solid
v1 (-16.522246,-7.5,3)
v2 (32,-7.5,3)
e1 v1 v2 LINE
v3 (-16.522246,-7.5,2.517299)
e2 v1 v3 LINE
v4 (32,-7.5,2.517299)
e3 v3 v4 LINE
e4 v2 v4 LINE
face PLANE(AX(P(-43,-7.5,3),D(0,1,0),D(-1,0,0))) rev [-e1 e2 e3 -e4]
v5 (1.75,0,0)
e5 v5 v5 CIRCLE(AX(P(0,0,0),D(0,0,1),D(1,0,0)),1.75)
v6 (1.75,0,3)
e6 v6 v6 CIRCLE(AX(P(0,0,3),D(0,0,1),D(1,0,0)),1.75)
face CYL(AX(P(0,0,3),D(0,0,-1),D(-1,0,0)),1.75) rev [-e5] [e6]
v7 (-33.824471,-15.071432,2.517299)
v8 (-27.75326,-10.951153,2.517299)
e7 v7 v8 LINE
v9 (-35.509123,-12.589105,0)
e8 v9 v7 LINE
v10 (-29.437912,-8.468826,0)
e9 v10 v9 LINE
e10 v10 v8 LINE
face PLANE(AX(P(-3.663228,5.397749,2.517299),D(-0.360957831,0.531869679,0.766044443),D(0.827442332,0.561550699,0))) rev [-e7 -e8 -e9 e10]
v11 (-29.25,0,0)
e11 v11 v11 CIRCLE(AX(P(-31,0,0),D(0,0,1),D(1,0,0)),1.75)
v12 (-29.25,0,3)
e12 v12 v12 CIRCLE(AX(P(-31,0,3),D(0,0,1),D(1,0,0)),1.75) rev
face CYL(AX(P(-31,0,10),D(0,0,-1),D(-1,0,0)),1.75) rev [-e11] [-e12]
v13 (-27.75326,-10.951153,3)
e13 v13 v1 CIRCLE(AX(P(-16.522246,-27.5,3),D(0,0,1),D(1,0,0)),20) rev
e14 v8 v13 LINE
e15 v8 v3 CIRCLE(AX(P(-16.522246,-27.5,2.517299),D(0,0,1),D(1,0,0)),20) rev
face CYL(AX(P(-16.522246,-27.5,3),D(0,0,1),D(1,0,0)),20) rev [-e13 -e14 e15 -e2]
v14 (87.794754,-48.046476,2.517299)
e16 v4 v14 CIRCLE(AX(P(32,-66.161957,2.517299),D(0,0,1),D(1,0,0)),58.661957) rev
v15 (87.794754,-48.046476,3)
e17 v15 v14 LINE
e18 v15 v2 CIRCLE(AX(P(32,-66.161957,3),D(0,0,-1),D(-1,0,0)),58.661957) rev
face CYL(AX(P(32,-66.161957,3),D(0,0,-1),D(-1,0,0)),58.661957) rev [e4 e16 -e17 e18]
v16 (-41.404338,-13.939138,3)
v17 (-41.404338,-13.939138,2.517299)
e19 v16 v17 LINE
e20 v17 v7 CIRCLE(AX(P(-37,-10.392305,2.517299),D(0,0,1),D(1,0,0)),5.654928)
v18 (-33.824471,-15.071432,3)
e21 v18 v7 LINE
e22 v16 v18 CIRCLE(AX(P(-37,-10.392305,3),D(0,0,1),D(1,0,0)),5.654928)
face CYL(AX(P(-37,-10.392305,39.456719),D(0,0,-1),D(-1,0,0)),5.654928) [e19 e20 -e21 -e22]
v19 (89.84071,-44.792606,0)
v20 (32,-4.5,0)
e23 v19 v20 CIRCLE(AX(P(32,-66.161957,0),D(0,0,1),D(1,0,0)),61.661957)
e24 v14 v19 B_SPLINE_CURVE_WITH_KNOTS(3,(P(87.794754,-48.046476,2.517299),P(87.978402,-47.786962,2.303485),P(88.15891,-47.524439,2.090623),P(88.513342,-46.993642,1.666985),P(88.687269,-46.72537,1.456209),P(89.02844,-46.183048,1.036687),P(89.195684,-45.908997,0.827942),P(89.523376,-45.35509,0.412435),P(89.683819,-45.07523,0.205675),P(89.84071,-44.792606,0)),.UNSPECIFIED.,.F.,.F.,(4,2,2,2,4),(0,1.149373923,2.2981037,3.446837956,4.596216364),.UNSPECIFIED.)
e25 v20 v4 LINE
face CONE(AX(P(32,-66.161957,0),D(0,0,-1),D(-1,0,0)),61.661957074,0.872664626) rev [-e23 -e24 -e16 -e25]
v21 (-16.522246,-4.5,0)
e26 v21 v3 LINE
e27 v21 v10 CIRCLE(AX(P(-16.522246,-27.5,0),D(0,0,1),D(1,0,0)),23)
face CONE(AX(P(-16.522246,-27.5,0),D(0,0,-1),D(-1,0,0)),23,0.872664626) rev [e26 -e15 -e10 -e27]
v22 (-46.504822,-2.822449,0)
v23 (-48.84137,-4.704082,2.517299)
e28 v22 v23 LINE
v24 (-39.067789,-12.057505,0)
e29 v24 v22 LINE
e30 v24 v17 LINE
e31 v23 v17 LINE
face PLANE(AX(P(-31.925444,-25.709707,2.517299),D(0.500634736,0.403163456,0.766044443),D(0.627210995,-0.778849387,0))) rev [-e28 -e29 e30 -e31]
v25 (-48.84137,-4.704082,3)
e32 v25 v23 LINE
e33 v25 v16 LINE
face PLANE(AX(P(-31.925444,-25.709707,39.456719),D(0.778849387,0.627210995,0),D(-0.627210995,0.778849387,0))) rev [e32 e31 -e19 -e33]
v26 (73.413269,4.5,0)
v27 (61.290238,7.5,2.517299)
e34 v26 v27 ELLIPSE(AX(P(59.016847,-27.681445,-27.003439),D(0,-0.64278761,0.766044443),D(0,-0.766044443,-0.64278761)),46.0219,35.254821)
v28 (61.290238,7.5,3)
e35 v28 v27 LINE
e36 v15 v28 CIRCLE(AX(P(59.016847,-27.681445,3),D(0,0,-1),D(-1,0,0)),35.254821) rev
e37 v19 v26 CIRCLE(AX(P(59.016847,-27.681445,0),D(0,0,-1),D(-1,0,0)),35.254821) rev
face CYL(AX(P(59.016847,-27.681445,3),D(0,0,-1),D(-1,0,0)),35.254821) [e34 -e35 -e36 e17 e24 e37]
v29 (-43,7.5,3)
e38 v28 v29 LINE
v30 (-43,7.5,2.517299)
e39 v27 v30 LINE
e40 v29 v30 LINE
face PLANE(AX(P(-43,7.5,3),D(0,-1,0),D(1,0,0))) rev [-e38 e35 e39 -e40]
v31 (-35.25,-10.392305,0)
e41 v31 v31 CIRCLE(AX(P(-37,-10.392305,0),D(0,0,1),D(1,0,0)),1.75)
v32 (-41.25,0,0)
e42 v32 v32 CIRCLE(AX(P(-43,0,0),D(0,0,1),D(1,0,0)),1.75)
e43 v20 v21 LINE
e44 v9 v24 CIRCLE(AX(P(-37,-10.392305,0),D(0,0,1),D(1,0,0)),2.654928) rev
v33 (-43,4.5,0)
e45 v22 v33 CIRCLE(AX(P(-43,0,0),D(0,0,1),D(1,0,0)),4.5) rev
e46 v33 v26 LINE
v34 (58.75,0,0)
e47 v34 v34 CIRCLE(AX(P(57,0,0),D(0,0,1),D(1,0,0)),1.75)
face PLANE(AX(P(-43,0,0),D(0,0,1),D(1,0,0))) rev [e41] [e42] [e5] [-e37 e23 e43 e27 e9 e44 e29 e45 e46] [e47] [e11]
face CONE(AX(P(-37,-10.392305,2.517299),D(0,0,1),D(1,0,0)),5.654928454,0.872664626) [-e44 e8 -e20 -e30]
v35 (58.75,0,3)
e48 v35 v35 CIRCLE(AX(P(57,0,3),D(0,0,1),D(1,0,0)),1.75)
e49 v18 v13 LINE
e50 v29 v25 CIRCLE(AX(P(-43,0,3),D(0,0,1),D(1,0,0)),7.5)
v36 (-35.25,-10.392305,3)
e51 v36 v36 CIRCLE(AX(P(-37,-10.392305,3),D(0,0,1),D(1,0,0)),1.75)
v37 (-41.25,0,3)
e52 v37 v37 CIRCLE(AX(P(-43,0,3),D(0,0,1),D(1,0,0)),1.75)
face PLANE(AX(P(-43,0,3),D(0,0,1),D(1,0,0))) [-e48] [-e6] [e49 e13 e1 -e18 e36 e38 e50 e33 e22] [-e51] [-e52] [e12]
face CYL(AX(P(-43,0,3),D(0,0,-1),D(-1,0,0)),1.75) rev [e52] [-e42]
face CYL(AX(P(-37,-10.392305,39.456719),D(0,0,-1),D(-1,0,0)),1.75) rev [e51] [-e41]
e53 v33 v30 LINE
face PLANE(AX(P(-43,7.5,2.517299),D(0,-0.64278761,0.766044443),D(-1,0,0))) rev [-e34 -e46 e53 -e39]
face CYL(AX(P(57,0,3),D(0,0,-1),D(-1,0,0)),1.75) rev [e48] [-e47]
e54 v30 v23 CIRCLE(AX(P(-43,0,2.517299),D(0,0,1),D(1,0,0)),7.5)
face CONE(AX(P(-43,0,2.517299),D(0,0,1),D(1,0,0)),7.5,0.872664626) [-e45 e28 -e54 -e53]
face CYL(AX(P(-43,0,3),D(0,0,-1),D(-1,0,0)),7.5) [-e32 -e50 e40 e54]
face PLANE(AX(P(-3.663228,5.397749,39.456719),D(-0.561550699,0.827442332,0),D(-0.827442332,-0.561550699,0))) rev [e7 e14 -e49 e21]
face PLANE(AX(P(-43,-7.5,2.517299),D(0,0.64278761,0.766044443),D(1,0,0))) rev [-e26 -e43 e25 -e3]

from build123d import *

# Parameters (mm, degrees)
IZIM1_R                     = 1.75
Y_KSEKLIK_EKSTR_ZYON1_DEPTH = 3
Y_KSEKLIK_EKSTR_ZYON2_DEPTH = 3
IZIM4_R                     = 1.75
Y_KSEKLIK_EKSTR_ZYON3_DEPTH = 3
RADYUS1_R                   = 20
IZIM4_3_R                   = 1.75
KES_EKSTR_ZYON1_DEPTH       = 10


with BuildPart() as part:
    # Çizim1 → Yükseklik-Ekstrüzyon1 (new body)
    with BuildSketch(Plane.XY):
        with BuildLine():
            Line((-43, 7.5), (57, 7.5))
            ThreePointArc((57, 7.5), (64.5, 0), (57, -7.5))
            Line((57, -7.5), (-43, -7.5))
            ThreePointArc((-43, -7.5), (-50.5, 0), (-43, 7.5))
        make_face()
        Circle(IZIM1_R, mode=Mode.SUBTRACT)
        with Locations((-43, 0)):
            Circle(IZIM1_R, mode=Mode.SUBTRACT)
        with Locations((57, 0)):
            Circle(IZIM1_R, mode=Mode.SUBTRACT)
    extrude(amount=Y_KSEKLIK_EKSTR_ZYON1_DEPTH)

    # Çizim2 → Yükseklik-Ekstrüzyon2 (add)
    with BuildSketch(Plane(origin=(0, 0, 0), x_dir=(-1, 0, 0), z_dir=(0, 0, -1))):
        with BuildLine():
            ThreePointArc((-57, -7.5), (-64.5, 0), (-57, 7.5))
            Line((-57, 7.5), (-61.290238096, 7.5))
            ThreePointArc((-61.290238096, 7.5), (-90.835057362, -12.499091059), (-87.794753659, -48.04647552))
            ThreePointArc((-87.794753659, -48.04647552), (-66.485762327, -18.707163802), (-32, -7.5))
            Line((-32, -7.5), (-57, -7.5))
        make_face()
    extrude(amount=-Y_KSEKLIK_EKSTR_ZYON2_DEPTH)

    # Çizim4 → Yükseklik-Ekstrüzyon3 (add)
    with BuildSketch(Plane.XY):
        with BuildLine():
            Line((-33.824470976, -15.071432033), (-22.668001232, -7.5))
            Line((-22.668001232, -7.5), (-22.668001232, 7.5))
            Line((-22.668001232, 7.5), (-43, 7.5))
            ThreePointArc((-43, 7.5), (-49.765006227, 3.23800722), (-48.841370401, -4.704082465))
            Line((-48.841370401, -4.704082465), (-41.404337559, -13.93913815))
            ThreePointArc((-41.404337559, -13.93913815), (-37.835472898, -15.985175384), (-33.824470976, -15.071432033))
        make_face()
        with Locations((-37, -10.392304845)):
            Circle(IZIM4_R, mode=Mode.SUBTRACT)
        with Locations((-43, 0)):
            Circle(IZIM4_R, mode=Mode.SUBTRACT)
        with Locations((-31, 0)):
            Circle(IZIM4_R, mode=Mode.SUBTRACT)
    extrude(amount=Y_KSEKLIK_EKSTR_ZYON3_DEPTH)

    # Radyus1
    radyus1_edges = [part.edges().sort_by_distance(p)[0] for p in [
        (-22.668001232, -7.5, 1.5),
    ]]
    fillet(radyus1_edges, radius=RADYUS1_R)

    # Çizim4<3> → Kes-Ekstrüzyon1 (cut)
    with BuildSketch(Plane.XY):
        with Locations((-31, 0)):
            Circle(IZIM4_3_R)
    extrude(amount=KES_EKSTR_ZYON1_DEPTH, mode=Mode.SUBTRACT)

    # Pah2
    # the kernel refuses this chamfer: 3, 2.517298894 mm, written as the material it takes off along each edge
    with BuildSketch(Plane(origin=(32, -66.161957074, 0), x_dir=(0.9999969206836817, -0.0024816573402179206, 0), z_dir=(-0.0024816573402179206, -0.9999969206836817, 0))) as pah2_piece_1:
        with BuildLine():
            Line((61.753882408, -0.077134513), (58.570031741, 2.594433407))
            Line((58.570031741, 2.594433407), (58.510031741, 2.594433407))
            ThreePointArc((58.510031741, 2.594433407), (58.601957074, 1.297216703), (58.601957074, 0))
            Line((58.601957074, 0), (58.661957074, -0.06))
            ThreePointArc((58.661957074, -0.06), (60.207919741, -0.06), (61.753882408, -0.137134513))
            Line((61.753882408, -0.137134513), (61.753882408, -0.077134513))
        make_face()
    revolve(axis=Axis((32, -66.161957074, 0), (0, 0, 1)), revolution_arc=90.142188638, mode=Mode.SUBTRACT)
    with BuildSketch(Plane(origin=(-43, 7.5, 0), x_dir=(0, -0.9996889667359941, -0.024939322090234348), z_dir=(1, 0, 0))) as pah2_piece_2:
        with BuildLine():
            Line((3.092887324, 0), (-0.156600152, -2.591333896))
            Line((-0.156600152, -2.591333896), (-0.21658149, -2.589837537))
            ThreePointArc((-0.21658149, -2.589837537), (-0.092333043, -1.295316866), (-0.059981338, 0.001496359))
            Line((-0.059981338, 0.001496359), (0.001496359, 0.059981338))
            ThreePointArc((0.001496359, 0.059981338), (1.54697818, 0.021426077), (3.094383683, 0.059981338))
            Line((3.094383683, 0.059981338), (3.092887324, 0))
        make_face()
    extrude(amount=122.84756204, mode=Mode.SUBTRACT)
    with BuildSketch(Plane(origin=(-48.841370401, -4.704082465, 0), x_dir=(0.7786071387098311, 0.6270159118904154, -0.024939322090234337), z_dir=(0.6272109953735269, -0.7788493867767694, 0))) as pah2_piece_3:
        with BuildLine():
            Line((3.092887324, 0), (-0.156600152, 2.591333896))
            Line((-0.156600152, 2.591333896), (-0.21658149, 2.589837537))
            ThreePointArc((-0.21658149, 2.589837537), (-0.092333043, 1.295316866), (-0.059981338, -0.001496359))
            Line((-0.059981338, -0.001496359), (0.001496359, -0.059981338))
            ThreePointArc((0.001496359, -0.059981338), (1.54697818, -0.021426077), (3.094383683, -0.059981338))
            Line((3.094383683, -0.059981338), (3.092887324, 0))
        make_face()
    extrude(amount=11.857306228, mode=Mode.SUBTRACT)
    with BuildSketch(Plane(origin=(-37, -10.392304845, 0), x_dir=(-0.7788493867767683, -0.6272109953735282, 0), z_dir=(-0.6272109953735282, 0.7788493867767683, 0))) as pah2_piece_4:
        with BuildLine():
            Line((2.563003121, -0.077134513), (5.746853788, 2.594433407))
            Line((5.746853788, 2.594433407), (5.806853788, 2.594433407))
            ThreePointArc((5.806853788, 2.594433407), (5.714928454, 1.297216703), (5.714928454, 0))
            Line((5.714928454, 0), (5.654928454, -0.06))
            ThreePointArc((5.654928454, -0.06), (4.108965788, -0.06), (2.563003121, -0.137134513))
            Line((2.563003121, -0.137134513), (2.563003121, -0.077134513))
        make_face()
    revolve(axis=Axis((-37, -10.392304845, 0), (0, 0, 1)), revolution_arc=85.318453593, mode=Mode.SUBTRACT)
    with BuildSketch(Plane(origin=(-33.824470976, -15.071432033, 0), x_dir=(-0.5613760376690521, 0.8271849699702446, -0.024939322090234337), z_dir=(0.8274423320595619, 0.5615506986157474, 0))) as pah2_piece_5:
        with BuildLine():
            Line((3.092887324, 0), (-0.156600152, 2.591333896))
            Line((-0.156600152, 2.591333896), (-0.21658149, 2.589837537))
            ThreePointArc((-0.21658149, 2.589837537), (-0.092333043, 1.295316866), (-0.059981338, -0.001496359))
            Line((-0.059981338, -0.001496359), (0.001496359, -0.059981338))
            ThreePointArc((0.001496359, -0.059981338), (1.54697818, -0.021426077), (3.094383683, -0.059981338))
            Line((3.094383683, -0.059981338), (3.092887324, 0))
        make_face()
    extrude(amount=7.337322676, mode=Mode.SUBTRACT)
    with BuildSketch(Plane(origin=(-43, 0, 0), x_dir=(-0.7788493867767701, -0.6272109953735259, 0), z_dir=(0.6272109953735259, -0.7788493867767701, 0))) as pah2_piece_6:
        with BuildLine():
            Line((4.408074667, 0.077134513), (7.591925333, -2.594433407))
            Line((7.591925333, -2.594433407), (7.651925333, -2.594433407))
            ThreePointArc((7.651925333, -2.594433407), (7.56, -1.297216703), (7.56, 0))
            Line((7.56, 0), (7.5, 0.06))
            ThreePointArc((7.5, 0.06), (5.954037333, 0.06), (4.408074667, 0.137134513))
            Line((4.408074667, 0.137134513), (4.408074667, 0.077134513))
        make_face()
    revolve(axis=Axis((-43, 0, 0), (0, 0, -1)), revolution_arc=128.844653269, mode=Mode.SUBTRACT)
    with BuildSketch(Plane(origin=(32, -7.5, 0), x_dir=(0, -0.035409536913662706, 0.9993728857116145), z_dir=(-1, 0, 0))) as pah2_piece_7:
        with BuildLine():
            Line((2.596061434, 0), (-0.186569785, 3.087255045))
            Line((-0.186569785, 3.087255045), (-0.246532158, 3.085130473))
            ThreePointArc((-0.246532158, 3.085130473), (-0.114704195, 1.542868599), (-0.059962373, -0.002124572))
            Line((-0.059962373, -0.002124572), (0.002124572, -0.059962373))
            ThreePointArc((0.002124572, -0.059962373), (1.298527772, -0.01402853), (2.598186006, -0.059962373))
            Line((2.598186006, -0.059962373), (2.596061434, 0))
        make_face()
    extrude(amount=48.522245618, mode=Mode.SUBTRACT)
    with BuildSketch(Plane(origin=(-16.522245618, -27.5, 0), x_dir=(0, 1, 0), z_dir=(1, 0, 0))) as pah2_piece_8:
        with BuildLine():
            Line((23.091925333, -0.077134513), (19.908074667, 2.594433407))
            Line((19.908074667, 2.594433407), (19.848074667, 2.594433407))
            ThreePointArc((19.848074667, 2.594433407), (19.94, 1.297216703), (19.94, 0))
            Line((19.94, 0), (20, -0.06))
            ThreePointArc((20, -0.06), (21.545962667, -0.06), (23.091925333, -0.137134513))
            Line((23.091925333, -0.137134513), (23.091925333, -0.077134513))
        make_face()
    revolve(axis=Axis((-16.522245618, -27.5, 0), (0, 0, 1)), revolution_arc=34.163106862, mode=Mode.SUBTRACT)


solid = part.part
